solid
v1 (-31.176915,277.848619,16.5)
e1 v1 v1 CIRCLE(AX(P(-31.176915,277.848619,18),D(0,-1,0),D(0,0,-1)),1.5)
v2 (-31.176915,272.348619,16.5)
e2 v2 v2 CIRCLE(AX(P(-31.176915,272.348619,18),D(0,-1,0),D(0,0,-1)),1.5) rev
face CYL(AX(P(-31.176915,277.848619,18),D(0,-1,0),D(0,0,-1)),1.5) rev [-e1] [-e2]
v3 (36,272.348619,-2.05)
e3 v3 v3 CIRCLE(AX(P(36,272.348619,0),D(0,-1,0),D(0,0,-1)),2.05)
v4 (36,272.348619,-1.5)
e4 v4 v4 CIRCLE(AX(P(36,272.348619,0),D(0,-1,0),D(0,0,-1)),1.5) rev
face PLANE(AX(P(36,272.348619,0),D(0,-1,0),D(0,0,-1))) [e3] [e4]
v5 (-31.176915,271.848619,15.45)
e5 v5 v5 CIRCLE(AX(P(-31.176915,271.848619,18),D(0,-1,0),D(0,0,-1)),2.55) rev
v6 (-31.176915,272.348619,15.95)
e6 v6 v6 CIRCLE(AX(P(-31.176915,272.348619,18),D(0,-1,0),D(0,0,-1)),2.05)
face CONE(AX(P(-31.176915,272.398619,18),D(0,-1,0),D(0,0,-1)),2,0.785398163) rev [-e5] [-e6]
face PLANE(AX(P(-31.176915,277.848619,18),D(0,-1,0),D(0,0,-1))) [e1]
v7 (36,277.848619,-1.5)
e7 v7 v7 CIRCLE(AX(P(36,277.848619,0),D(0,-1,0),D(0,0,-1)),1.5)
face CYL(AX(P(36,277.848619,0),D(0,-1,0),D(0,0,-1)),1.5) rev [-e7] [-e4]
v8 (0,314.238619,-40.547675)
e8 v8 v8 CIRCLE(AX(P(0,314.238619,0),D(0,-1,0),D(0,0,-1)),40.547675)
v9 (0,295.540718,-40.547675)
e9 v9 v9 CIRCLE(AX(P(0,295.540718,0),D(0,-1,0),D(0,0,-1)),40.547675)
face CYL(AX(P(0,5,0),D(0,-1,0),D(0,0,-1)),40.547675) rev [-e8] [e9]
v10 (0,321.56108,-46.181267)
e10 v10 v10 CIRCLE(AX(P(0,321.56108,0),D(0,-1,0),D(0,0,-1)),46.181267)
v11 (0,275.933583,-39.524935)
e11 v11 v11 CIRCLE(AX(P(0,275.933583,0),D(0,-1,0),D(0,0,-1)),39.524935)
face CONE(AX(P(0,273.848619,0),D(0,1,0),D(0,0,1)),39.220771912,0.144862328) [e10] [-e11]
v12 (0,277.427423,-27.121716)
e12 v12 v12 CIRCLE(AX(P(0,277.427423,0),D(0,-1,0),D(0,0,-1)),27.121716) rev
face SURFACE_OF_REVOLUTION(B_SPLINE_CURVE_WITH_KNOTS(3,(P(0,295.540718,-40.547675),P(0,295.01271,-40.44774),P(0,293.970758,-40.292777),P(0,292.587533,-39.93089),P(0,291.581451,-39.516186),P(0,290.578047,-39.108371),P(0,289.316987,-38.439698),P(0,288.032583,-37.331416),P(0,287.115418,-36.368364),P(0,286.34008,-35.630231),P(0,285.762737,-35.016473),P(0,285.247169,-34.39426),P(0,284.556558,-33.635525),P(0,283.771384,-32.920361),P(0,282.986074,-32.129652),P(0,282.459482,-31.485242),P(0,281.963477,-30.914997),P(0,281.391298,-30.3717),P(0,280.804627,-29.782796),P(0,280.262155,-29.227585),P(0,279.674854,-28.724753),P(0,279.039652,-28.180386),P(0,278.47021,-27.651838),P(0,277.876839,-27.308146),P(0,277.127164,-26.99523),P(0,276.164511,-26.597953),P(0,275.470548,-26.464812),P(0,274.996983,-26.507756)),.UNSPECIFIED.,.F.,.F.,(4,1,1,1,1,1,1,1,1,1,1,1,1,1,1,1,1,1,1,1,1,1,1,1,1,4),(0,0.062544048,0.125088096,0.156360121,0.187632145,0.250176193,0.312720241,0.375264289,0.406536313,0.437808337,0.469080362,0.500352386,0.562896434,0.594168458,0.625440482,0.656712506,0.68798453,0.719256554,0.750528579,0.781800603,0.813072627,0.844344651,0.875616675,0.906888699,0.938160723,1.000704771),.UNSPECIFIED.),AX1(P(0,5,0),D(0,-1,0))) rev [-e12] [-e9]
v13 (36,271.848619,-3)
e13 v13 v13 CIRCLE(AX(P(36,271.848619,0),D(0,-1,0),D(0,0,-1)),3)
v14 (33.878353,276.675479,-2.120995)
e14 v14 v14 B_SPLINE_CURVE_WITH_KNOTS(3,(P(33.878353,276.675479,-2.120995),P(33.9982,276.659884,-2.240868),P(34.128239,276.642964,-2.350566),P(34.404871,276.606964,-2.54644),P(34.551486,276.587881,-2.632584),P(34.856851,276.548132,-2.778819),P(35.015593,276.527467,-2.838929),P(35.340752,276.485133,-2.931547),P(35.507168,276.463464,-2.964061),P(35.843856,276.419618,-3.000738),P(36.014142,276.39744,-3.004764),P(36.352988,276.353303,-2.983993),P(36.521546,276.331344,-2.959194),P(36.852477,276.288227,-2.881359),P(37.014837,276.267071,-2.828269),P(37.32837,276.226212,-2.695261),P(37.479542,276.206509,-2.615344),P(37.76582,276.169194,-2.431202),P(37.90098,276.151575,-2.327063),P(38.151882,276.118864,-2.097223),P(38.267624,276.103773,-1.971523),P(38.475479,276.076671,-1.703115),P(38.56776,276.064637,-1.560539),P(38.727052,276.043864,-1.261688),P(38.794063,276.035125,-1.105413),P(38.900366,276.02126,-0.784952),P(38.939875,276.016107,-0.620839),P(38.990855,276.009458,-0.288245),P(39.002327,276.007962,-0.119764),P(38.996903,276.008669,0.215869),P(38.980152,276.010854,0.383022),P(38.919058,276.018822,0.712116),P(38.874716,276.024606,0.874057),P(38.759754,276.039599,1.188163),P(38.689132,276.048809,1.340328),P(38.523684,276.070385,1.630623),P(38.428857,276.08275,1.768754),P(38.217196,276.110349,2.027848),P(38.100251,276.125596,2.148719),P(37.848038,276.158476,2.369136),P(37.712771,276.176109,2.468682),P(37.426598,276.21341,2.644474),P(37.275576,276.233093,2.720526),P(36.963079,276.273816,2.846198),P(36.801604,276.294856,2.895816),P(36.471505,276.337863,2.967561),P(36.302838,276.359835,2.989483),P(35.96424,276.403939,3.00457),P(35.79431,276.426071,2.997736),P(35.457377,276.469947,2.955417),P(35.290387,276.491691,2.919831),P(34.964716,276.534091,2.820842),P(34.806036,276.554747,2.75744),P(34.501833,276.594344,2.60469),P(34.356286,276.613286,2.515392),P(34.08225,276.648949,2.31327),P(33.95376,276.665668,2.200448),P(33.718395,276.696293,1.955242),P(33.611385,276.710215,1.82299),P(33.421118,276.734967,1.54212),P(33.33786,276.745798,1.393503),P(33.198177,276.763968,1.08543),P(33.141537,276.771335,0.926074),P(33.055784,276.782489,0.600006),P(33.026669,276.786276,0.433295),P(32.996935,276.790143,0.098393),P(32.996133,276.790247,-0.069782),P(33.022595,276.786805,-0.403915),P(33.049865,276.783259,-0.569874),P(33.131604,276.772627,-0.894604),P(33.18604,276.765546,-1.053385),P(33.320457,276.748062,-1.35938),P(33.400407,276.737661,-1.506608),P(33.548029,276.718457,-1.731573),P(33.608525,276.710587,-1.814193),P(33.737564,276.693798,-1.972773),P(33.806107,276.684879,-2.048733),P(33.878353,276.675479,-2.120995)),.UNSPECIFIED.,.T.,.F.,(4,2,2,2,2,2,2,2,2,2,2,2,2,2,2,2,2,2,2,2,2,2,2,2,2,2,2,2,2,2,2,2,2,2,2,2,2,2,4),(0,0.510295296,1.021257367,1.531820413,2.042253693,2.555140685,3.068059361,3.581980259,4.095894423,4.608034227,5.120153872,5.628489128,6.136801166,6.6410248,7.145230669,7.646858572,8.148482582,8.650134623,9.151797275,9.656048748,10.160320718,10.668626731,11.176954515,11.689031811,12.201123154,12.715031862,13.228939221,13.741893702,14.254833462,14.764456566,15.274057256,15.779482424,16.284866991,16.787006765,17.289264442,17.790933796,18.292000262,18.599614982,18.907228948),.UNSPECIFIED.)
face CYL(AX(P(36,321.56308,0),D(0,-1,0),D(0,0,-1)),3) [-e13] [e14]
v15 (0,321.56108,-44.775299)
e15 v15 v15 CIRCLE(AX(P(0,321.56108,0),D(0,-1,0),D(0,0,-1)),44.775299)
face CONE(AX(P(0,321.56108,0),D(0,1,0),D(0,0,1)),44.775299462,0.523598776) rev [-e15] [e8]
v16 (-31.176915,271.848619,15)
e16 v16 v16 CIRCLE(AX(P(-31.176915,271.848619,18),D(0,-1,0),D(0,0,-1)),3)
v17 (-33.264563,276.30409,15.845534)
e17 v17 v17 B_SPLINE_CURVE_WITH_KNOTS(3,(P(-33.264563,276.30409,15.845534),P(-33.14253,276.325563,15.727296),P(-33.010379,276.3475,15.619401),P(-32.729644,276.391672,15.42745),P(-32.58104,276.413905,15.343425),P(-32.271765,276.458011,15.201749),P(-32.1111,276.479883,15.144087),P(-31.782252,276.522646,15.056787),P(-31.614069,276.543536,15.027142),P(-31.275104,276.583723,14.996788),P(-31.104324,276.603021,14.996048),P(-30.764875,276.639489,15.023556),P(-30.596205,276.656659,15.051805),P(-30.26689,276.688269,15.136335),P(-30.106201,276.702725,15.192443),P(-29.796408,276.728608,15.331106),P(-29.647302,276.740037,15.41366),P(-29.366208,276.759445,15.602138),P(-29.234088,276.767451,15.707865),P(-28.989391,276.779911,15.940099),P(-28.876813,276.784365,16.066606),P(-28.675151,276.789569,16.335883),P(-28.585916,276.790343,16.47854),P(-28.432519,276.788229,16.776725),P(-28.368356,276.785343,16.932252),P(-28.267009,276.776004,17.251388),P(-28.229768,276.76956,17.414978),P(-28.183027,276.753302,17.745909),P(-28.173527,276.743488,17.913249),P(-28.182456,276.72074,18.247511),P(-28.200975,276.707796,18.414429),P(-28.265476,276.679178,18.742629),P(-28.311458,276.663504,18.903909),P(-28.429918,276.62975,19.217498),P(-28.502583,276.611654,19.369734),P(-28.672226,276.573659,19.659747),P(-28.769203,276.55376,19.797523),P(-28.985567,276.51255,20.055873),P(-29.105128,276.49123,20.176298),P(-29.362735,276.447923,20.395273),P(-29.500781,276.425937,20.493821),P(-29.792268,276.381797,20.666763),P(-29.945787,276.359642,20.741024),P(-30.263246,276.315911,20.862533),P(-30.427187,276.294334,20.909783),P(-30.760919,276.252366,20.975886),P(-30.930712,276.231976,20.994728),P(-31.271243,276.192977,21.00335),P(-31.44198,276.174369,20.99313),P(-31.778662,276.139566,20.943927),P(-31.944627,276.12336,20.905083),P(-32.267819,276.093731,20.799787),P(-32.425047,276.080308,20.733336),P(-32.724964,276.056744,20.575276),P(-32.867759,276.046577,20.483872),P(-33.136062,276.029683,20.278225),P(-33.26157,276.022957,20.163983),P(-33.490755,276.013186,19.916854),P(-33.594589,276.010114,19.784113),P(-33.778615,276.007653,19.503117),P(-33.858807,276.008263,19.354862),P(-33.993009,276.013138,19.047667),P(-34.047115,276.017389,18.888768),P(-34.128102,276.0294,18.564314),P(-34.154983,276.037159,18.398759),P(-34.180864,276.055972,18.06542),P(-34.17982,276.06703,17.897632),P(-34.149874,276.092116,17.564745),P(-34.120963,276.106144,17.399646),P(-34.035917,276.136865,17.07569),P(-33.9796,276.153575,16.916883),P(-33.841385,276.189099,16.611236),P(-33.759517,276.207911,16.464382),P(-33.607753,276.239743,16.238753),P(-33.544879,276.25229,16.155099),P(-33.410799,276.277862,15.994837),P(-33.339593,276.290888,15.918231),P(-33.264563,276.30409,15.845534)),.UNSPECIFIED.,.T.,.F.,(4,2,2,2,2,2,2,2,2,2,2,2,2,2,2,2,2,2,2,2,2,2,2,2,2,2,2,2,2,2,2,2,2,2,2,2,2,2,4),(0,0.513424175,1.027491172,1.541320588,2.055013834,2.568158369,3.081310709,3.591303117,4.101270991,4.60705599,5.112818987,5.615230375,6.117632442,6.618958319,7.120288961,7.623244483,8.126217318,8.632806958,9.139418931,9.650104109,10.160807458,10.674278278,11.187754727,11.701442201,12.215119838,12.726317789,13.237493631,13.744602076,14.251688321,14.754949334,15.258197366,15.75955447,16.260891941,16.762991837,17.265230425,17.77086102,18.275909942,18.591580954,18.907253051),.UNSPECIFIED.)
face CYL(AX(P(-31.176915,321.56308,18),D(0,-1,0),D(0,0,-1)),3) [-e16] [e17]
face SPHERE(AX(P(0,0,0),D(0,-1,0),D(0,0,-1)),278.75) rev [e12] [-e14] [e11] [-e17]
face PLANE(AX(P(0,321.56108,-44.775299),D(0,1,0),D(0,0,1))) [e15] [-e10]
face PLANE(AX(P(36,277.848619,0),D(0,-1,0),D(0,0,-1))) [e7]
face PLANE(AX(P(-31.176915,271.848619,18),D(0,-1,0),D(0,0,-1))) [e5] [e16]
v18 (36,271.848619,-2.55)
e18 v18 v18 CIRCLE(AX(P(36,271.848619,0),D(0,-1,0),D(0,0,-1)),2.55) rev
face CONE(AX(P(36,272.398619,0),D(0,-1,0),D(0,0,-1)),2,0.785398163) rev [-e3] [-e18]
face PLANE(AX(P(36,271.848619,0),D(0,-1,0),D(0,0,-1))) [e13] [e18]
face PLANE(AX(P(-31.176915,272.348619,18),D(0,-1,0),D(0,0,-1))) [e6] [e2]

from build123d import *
from OCP.BRepAlgoAPI import BRepAlgoAPI_Cut
from OCP.TopTools import TopTools_ListOfShape

# Parameters (mm, degrees)
SKETCH4_R                       = 3
BOSS_EXTRUDE1_DEPTH             = 2
SKETCH4_2_R                     = 3
BOSS_EXTRUDE3_DEPTH             = 2
BOSS_EXTRUDE3_DIRECTION_2_REACH = 82.882
SKETCH13_R                      = 1.5
CUT_EXTRUDE1_DEPTH              = 6
SKETCH14_R                      = 2
CUT_EXTRUDE2_DEPTH              = 0.5
CHAMFER3_SIZE                   = 0.55


with BuildPart() as part:
    # Sketch2 → Revolve6 (revolve)
    with BuildSketch(Plane(origin=(0, 0, 0), x_dir=(0, 0, -1), z_dir=(1, 0, 0))):
        with BuildLine():
            Line((26.5077562, 274.996982717), (26.5077562, 273.848618937))
            Line((26.5077562, 273.848618937), (39.220771912, 273.848618937))
            Line((39.220771912, 273.848618937), (46.181267187, 321.561079724))
            Line((46.181267187, 321.561079724), (44.775299462, 321.561079724))
            Line((44.775299462, 321.561079724), (40.547674755, 314.238618937))
            Line((40.547674755, 314.238618937), (40.547674755, 295.540718438))
            add(Edge.make_bspline(
                [(40.547674755, 295.540718438), (40.447740466, 295.012709616), (40.292777353, 293.970757619), (39.930889755, 292.587532753), (39.516186416, 291.581451359), (39.108370782, 290.57804728), (38.439698054, 289.316986818), (37.331416086, 288.032583079), (36.368363881, 287.115418474), (35.630231264, 286.340079673), (35.016472726, 285.762737126), (34.394259795, 285.247169223), (33.635524662, 284.556557999), (32.920361334, 283.771384038), (32.129651901, 282.986073936), (31.485241784, 282.459482323), (30.914997208, 281.963476573), (30.371700346, 281.391298159), (29.782796159, 280.80462685), (29.227584581, 280.262154528), (28.724752618, 279.674853681), (28.180386253, 279.039651715), (27.651838315, 278.470209992), (27.308145935, 277.876839187), (26.995230081, 277.127164256), (26.597952618, 276.164510632), (26.464811583, 275.470548141), (26.5077562, 274.996982717)],
                knots=[0, 0, 0, 0, 0.062544048, 0.125088096, 0.156360121, 0.187632145, 0.250176193, 0.312720241, 0.375264289, 0.406536313, 0.437808337, 0.469080362, 0.500352386, 0.562896434, 0.594168458, 0.625440482, 0.656712506, 0.68798453, 0.719256554, 0.750528579, 0.781800603, 0.813072627, 0.844344651, 0.875616675, 0.906888699, 0.938160723, 1.000704771, 1.000704771, 1.000704771, 1.000704771], degree=3))
        make_face()
    revolve(axis=Axis((0, 5, 0), (0, 1, 0)))

    # Sketch4 → Boss-Extrude1 (add)
    with BuildSketch(Plane.XZ.offset(-273.848618937)):
        with Locations(Location((-31.176914536, 18, 0), (0, 0, 270))):
            Circle(SKETCH4_R)
        with Locations(Location((36, 0, 0), (0, 0, 270))):
            Circle(SKETCH4_R)
    extrude(amount=BOSS_EXTRUDE1_DEPTH)

    # Sketch7 → Revolve7 (revolve)
    with BuildSketch(Plane(origin=(0, 0, 0), x_dir=(0, 0, -1), z_dir=(1, 0, 0))):
        with BuildLine():
            Line((39.220771912, 273.848618937), (39.220771912, 272.319355593))
            ThreePointArc((39.220771912, 272.319355593), (32.873157949, 273.157923648), (26.5077562, 273.848618937))
            Line((26.5077562, 273.848618937), (26.5077562, 274.348618937))
            Line((26.5077562, 274.348618937), (39.220771912, 274.348618937))
            Line((39.220771912, 274.348618937), (39.220771912, 273.848618937))
        make_face()
    revolve(axis=Axis((0, 5, 0), (0, 1, 0)))


with BuildPart() as cut_revolve3_tool:
    # Sketch12 → Cut-Revolve3 (revolve)
    with BuildSketch(Plane(origin=(0, 0, 0), x_dir=(0, 0, -1), z_dir=(1, 0, 0))):
        with BuildLine():
            Line((26.0877562, 277.526559948), (26.0877562, 267.526559948))
            Line((26.0877562, 267.526559948), (40.0877562, 267.526559948))
            Line((40.0877562, 267.526559948), (40.0877562, 275.852377736))
            ThreePointArc((40.0877562, 275.852377736), (33.098343341, 276.778001597), (26.0877562, 277.526559948))
        make_face()
    revolve(axis=Axis((0, 5, 0), (0, 1, 0)))


with BuildPart() as part_1:
    add(part.part)

    # Cut-Revolve3: cut by cut_revolve3_tool, with a tolerance
    cut_revolve3_stock = TopTools_ListOfShape()
    cut_revolve3_stock.Append(part_1.part.wrapped)
    cut_revolve3_tools = TopTools_ListOfShape()
    cut_revolve3_tools.Append(cut_revolve3_tool.part.wrapped)
    cut_revolve3_cut = BRepAlgoAPI_Cut()
    cut_revolve3_cut.SetArguments(cut_revolve3_stock)
    cut_revolve3_cut.SetTools(cut_revolve3_tools)
    cut_revolve3_cut.SetFuzzyValue(0.00001)
    cut_revolve3_cut.Build()
    add(Compound.cast(cut_revolve3_cut.Shape()).solids(), mode=Mode.REPLACE)

    # Sketch4<2> → Boss-Extrude3 (add)
    with BuildSketch(Plane.XZ.offset(-273.848618937)):
        with Locations(Location((-31.176914536, 18, 0), (0, 0, 270))):
            Circle(SKETCH4_2_R)
        with Locations(Location((36, 0, 0), (0, 0, 270))):
            Circle(SKETCH4_2_R)
    extrude(amount=BOSS_EXTRUDE3_DEPTH)

    # Sketch4<2> → Boss-Extrude3 direction 2 (add, up to next)
    with BuildSketch(Plane.XZ.offset(-273.848618937), mode=Mode.PRIVATE) as boss_extrude3_direction_2_sk1:
        with Locations(Location((-31.176914536, 18, 0), (0, 0, 270))):
            Circle(SKETCH4_2_R)
    boss_extrude3_direction_2_tool1 = extrude(boss_extrude3_direction_2_sk1.sketch, amount=-BOSS_EXTRUDE3_DIRECTION_2_REACH, mode=Mode.PRIVATE) - part_1.part
    # Sketch4<2> → Boss-Extrude3 direction 2 (add, up to next)
    with BuildSketch(Plane.XZ.offset(-273.848618937), mode=Mode.PRIVATE) as boss_extrude3_direction_2_sk2:
        with Locations(Location((36, 0, 0), (0, 0, 270))):
            Circle(SKETCH4_2_R)
    boss_extrude3_direction_2_tool2 = extrude(boss_extrude3_direction_2_sk2.sketch, amount=-BOSS_EXTRUDE3_DIRECTION_2_REACH, mode=Mode.PRIVATE) - part_1.part
    add(boss_extrude3_direction_2_tool1.solids().sort_by_distance((-31.176915, 273.848619, 18))[0])
    add(boss_extrude3_direction_2_tool2.solids().sort_by_distance((36, 273.848619, 0))[0])

    # Sketch13 → Cut-Extrude1 (cut)
    with BuildSketch(Plane.XZ.offset(-271.848618937)):
        with Locations(Location((-31.176914536, 18, 0), (0, 0, 270))):
            Circle(SKETCH13_R)
        with Locations(Location((36, 0, 0), (0, 0, 270))):
            Circle(SKETCH13_R)
    extrude(amount=-CUT_EXTRUDE1_DEPTH, mode=Mode.SUBTRACT)

    # Sketch14 → Cut-Extrude2 (cut)
    with BuildSketch(Plane.XZ.offset(-271.848618937)):
        with Locations(Location((-31.176914536, 18, 0), (0, 0, 270))):
            Circle(SKETCH14_R)
        with Locations(Location((36, 0, 0), (0, 0, 270))):
            Circle(SKETCH14_R)
    extrude(amount=-CUT_EXTRUDE2_DEPTH, mode=Mode.SUBTRACT)

    # Chamfer3
    # the kernel refuses this chamfer: 0.55 mm, written as the material it takes off along each edge
    with BuildSketch(Plane(origin=(36, 271.848618937, 0), x_dir=(0, 0, -1), z_dir=(-1, 0, 0))) as chamfer3_piece_1_section:
        Polygon((2 + CHAMFER3_SIZE, 0), (2, -CHAMFER3_SIZE), (2, 0), align=None)
    chamfer3_piece_1 = revolve(axis=Axis((36, 271.848618937, 0), (0, -1, 0)), mode=Mode.PRIVATE)
    chamfer3_piece_1 = split(chamfer3_piece_1, bisect_by=Plane(origin=(36, 272.348618937, 0), z_dir=(0, -1, 0)), keep=Keep.TOP, mode=Mode.PRIVATE)
    add(chamfer3_piece_1, mode=Mode.SUBTRACT)
    with BuildSketch(Plane(origin=(-31.176914536, 271.848618937, 18), x_dir=(0, 0, -1), z_dir=(-1, 0, 0))) as chamfer3_piece_2_section:
        Polygon((2 + CHAMFER3_SIZE, 0), (2, -CHAMFER3_SIZE), (2, 0), align=None)
    chamfer3_piece_2 = revolve(axis=Axis((-31.176914536, 271.848618937, 18), (0, -1, 0)), mode=Mode.PRIVATE)
    chamfer3_piece_2 = split(chamfer3_piece_2, bisect_by=Plane(origin=(-31.176914536, 272.348618937, 18), z_dir=(0, -1, 0)), keep=Keep.TOP, mode=Mode.PRIVATE)
    add(chamfer3_piece_2, mode=Mode.SUBTRACT)


solid = part_1.part
